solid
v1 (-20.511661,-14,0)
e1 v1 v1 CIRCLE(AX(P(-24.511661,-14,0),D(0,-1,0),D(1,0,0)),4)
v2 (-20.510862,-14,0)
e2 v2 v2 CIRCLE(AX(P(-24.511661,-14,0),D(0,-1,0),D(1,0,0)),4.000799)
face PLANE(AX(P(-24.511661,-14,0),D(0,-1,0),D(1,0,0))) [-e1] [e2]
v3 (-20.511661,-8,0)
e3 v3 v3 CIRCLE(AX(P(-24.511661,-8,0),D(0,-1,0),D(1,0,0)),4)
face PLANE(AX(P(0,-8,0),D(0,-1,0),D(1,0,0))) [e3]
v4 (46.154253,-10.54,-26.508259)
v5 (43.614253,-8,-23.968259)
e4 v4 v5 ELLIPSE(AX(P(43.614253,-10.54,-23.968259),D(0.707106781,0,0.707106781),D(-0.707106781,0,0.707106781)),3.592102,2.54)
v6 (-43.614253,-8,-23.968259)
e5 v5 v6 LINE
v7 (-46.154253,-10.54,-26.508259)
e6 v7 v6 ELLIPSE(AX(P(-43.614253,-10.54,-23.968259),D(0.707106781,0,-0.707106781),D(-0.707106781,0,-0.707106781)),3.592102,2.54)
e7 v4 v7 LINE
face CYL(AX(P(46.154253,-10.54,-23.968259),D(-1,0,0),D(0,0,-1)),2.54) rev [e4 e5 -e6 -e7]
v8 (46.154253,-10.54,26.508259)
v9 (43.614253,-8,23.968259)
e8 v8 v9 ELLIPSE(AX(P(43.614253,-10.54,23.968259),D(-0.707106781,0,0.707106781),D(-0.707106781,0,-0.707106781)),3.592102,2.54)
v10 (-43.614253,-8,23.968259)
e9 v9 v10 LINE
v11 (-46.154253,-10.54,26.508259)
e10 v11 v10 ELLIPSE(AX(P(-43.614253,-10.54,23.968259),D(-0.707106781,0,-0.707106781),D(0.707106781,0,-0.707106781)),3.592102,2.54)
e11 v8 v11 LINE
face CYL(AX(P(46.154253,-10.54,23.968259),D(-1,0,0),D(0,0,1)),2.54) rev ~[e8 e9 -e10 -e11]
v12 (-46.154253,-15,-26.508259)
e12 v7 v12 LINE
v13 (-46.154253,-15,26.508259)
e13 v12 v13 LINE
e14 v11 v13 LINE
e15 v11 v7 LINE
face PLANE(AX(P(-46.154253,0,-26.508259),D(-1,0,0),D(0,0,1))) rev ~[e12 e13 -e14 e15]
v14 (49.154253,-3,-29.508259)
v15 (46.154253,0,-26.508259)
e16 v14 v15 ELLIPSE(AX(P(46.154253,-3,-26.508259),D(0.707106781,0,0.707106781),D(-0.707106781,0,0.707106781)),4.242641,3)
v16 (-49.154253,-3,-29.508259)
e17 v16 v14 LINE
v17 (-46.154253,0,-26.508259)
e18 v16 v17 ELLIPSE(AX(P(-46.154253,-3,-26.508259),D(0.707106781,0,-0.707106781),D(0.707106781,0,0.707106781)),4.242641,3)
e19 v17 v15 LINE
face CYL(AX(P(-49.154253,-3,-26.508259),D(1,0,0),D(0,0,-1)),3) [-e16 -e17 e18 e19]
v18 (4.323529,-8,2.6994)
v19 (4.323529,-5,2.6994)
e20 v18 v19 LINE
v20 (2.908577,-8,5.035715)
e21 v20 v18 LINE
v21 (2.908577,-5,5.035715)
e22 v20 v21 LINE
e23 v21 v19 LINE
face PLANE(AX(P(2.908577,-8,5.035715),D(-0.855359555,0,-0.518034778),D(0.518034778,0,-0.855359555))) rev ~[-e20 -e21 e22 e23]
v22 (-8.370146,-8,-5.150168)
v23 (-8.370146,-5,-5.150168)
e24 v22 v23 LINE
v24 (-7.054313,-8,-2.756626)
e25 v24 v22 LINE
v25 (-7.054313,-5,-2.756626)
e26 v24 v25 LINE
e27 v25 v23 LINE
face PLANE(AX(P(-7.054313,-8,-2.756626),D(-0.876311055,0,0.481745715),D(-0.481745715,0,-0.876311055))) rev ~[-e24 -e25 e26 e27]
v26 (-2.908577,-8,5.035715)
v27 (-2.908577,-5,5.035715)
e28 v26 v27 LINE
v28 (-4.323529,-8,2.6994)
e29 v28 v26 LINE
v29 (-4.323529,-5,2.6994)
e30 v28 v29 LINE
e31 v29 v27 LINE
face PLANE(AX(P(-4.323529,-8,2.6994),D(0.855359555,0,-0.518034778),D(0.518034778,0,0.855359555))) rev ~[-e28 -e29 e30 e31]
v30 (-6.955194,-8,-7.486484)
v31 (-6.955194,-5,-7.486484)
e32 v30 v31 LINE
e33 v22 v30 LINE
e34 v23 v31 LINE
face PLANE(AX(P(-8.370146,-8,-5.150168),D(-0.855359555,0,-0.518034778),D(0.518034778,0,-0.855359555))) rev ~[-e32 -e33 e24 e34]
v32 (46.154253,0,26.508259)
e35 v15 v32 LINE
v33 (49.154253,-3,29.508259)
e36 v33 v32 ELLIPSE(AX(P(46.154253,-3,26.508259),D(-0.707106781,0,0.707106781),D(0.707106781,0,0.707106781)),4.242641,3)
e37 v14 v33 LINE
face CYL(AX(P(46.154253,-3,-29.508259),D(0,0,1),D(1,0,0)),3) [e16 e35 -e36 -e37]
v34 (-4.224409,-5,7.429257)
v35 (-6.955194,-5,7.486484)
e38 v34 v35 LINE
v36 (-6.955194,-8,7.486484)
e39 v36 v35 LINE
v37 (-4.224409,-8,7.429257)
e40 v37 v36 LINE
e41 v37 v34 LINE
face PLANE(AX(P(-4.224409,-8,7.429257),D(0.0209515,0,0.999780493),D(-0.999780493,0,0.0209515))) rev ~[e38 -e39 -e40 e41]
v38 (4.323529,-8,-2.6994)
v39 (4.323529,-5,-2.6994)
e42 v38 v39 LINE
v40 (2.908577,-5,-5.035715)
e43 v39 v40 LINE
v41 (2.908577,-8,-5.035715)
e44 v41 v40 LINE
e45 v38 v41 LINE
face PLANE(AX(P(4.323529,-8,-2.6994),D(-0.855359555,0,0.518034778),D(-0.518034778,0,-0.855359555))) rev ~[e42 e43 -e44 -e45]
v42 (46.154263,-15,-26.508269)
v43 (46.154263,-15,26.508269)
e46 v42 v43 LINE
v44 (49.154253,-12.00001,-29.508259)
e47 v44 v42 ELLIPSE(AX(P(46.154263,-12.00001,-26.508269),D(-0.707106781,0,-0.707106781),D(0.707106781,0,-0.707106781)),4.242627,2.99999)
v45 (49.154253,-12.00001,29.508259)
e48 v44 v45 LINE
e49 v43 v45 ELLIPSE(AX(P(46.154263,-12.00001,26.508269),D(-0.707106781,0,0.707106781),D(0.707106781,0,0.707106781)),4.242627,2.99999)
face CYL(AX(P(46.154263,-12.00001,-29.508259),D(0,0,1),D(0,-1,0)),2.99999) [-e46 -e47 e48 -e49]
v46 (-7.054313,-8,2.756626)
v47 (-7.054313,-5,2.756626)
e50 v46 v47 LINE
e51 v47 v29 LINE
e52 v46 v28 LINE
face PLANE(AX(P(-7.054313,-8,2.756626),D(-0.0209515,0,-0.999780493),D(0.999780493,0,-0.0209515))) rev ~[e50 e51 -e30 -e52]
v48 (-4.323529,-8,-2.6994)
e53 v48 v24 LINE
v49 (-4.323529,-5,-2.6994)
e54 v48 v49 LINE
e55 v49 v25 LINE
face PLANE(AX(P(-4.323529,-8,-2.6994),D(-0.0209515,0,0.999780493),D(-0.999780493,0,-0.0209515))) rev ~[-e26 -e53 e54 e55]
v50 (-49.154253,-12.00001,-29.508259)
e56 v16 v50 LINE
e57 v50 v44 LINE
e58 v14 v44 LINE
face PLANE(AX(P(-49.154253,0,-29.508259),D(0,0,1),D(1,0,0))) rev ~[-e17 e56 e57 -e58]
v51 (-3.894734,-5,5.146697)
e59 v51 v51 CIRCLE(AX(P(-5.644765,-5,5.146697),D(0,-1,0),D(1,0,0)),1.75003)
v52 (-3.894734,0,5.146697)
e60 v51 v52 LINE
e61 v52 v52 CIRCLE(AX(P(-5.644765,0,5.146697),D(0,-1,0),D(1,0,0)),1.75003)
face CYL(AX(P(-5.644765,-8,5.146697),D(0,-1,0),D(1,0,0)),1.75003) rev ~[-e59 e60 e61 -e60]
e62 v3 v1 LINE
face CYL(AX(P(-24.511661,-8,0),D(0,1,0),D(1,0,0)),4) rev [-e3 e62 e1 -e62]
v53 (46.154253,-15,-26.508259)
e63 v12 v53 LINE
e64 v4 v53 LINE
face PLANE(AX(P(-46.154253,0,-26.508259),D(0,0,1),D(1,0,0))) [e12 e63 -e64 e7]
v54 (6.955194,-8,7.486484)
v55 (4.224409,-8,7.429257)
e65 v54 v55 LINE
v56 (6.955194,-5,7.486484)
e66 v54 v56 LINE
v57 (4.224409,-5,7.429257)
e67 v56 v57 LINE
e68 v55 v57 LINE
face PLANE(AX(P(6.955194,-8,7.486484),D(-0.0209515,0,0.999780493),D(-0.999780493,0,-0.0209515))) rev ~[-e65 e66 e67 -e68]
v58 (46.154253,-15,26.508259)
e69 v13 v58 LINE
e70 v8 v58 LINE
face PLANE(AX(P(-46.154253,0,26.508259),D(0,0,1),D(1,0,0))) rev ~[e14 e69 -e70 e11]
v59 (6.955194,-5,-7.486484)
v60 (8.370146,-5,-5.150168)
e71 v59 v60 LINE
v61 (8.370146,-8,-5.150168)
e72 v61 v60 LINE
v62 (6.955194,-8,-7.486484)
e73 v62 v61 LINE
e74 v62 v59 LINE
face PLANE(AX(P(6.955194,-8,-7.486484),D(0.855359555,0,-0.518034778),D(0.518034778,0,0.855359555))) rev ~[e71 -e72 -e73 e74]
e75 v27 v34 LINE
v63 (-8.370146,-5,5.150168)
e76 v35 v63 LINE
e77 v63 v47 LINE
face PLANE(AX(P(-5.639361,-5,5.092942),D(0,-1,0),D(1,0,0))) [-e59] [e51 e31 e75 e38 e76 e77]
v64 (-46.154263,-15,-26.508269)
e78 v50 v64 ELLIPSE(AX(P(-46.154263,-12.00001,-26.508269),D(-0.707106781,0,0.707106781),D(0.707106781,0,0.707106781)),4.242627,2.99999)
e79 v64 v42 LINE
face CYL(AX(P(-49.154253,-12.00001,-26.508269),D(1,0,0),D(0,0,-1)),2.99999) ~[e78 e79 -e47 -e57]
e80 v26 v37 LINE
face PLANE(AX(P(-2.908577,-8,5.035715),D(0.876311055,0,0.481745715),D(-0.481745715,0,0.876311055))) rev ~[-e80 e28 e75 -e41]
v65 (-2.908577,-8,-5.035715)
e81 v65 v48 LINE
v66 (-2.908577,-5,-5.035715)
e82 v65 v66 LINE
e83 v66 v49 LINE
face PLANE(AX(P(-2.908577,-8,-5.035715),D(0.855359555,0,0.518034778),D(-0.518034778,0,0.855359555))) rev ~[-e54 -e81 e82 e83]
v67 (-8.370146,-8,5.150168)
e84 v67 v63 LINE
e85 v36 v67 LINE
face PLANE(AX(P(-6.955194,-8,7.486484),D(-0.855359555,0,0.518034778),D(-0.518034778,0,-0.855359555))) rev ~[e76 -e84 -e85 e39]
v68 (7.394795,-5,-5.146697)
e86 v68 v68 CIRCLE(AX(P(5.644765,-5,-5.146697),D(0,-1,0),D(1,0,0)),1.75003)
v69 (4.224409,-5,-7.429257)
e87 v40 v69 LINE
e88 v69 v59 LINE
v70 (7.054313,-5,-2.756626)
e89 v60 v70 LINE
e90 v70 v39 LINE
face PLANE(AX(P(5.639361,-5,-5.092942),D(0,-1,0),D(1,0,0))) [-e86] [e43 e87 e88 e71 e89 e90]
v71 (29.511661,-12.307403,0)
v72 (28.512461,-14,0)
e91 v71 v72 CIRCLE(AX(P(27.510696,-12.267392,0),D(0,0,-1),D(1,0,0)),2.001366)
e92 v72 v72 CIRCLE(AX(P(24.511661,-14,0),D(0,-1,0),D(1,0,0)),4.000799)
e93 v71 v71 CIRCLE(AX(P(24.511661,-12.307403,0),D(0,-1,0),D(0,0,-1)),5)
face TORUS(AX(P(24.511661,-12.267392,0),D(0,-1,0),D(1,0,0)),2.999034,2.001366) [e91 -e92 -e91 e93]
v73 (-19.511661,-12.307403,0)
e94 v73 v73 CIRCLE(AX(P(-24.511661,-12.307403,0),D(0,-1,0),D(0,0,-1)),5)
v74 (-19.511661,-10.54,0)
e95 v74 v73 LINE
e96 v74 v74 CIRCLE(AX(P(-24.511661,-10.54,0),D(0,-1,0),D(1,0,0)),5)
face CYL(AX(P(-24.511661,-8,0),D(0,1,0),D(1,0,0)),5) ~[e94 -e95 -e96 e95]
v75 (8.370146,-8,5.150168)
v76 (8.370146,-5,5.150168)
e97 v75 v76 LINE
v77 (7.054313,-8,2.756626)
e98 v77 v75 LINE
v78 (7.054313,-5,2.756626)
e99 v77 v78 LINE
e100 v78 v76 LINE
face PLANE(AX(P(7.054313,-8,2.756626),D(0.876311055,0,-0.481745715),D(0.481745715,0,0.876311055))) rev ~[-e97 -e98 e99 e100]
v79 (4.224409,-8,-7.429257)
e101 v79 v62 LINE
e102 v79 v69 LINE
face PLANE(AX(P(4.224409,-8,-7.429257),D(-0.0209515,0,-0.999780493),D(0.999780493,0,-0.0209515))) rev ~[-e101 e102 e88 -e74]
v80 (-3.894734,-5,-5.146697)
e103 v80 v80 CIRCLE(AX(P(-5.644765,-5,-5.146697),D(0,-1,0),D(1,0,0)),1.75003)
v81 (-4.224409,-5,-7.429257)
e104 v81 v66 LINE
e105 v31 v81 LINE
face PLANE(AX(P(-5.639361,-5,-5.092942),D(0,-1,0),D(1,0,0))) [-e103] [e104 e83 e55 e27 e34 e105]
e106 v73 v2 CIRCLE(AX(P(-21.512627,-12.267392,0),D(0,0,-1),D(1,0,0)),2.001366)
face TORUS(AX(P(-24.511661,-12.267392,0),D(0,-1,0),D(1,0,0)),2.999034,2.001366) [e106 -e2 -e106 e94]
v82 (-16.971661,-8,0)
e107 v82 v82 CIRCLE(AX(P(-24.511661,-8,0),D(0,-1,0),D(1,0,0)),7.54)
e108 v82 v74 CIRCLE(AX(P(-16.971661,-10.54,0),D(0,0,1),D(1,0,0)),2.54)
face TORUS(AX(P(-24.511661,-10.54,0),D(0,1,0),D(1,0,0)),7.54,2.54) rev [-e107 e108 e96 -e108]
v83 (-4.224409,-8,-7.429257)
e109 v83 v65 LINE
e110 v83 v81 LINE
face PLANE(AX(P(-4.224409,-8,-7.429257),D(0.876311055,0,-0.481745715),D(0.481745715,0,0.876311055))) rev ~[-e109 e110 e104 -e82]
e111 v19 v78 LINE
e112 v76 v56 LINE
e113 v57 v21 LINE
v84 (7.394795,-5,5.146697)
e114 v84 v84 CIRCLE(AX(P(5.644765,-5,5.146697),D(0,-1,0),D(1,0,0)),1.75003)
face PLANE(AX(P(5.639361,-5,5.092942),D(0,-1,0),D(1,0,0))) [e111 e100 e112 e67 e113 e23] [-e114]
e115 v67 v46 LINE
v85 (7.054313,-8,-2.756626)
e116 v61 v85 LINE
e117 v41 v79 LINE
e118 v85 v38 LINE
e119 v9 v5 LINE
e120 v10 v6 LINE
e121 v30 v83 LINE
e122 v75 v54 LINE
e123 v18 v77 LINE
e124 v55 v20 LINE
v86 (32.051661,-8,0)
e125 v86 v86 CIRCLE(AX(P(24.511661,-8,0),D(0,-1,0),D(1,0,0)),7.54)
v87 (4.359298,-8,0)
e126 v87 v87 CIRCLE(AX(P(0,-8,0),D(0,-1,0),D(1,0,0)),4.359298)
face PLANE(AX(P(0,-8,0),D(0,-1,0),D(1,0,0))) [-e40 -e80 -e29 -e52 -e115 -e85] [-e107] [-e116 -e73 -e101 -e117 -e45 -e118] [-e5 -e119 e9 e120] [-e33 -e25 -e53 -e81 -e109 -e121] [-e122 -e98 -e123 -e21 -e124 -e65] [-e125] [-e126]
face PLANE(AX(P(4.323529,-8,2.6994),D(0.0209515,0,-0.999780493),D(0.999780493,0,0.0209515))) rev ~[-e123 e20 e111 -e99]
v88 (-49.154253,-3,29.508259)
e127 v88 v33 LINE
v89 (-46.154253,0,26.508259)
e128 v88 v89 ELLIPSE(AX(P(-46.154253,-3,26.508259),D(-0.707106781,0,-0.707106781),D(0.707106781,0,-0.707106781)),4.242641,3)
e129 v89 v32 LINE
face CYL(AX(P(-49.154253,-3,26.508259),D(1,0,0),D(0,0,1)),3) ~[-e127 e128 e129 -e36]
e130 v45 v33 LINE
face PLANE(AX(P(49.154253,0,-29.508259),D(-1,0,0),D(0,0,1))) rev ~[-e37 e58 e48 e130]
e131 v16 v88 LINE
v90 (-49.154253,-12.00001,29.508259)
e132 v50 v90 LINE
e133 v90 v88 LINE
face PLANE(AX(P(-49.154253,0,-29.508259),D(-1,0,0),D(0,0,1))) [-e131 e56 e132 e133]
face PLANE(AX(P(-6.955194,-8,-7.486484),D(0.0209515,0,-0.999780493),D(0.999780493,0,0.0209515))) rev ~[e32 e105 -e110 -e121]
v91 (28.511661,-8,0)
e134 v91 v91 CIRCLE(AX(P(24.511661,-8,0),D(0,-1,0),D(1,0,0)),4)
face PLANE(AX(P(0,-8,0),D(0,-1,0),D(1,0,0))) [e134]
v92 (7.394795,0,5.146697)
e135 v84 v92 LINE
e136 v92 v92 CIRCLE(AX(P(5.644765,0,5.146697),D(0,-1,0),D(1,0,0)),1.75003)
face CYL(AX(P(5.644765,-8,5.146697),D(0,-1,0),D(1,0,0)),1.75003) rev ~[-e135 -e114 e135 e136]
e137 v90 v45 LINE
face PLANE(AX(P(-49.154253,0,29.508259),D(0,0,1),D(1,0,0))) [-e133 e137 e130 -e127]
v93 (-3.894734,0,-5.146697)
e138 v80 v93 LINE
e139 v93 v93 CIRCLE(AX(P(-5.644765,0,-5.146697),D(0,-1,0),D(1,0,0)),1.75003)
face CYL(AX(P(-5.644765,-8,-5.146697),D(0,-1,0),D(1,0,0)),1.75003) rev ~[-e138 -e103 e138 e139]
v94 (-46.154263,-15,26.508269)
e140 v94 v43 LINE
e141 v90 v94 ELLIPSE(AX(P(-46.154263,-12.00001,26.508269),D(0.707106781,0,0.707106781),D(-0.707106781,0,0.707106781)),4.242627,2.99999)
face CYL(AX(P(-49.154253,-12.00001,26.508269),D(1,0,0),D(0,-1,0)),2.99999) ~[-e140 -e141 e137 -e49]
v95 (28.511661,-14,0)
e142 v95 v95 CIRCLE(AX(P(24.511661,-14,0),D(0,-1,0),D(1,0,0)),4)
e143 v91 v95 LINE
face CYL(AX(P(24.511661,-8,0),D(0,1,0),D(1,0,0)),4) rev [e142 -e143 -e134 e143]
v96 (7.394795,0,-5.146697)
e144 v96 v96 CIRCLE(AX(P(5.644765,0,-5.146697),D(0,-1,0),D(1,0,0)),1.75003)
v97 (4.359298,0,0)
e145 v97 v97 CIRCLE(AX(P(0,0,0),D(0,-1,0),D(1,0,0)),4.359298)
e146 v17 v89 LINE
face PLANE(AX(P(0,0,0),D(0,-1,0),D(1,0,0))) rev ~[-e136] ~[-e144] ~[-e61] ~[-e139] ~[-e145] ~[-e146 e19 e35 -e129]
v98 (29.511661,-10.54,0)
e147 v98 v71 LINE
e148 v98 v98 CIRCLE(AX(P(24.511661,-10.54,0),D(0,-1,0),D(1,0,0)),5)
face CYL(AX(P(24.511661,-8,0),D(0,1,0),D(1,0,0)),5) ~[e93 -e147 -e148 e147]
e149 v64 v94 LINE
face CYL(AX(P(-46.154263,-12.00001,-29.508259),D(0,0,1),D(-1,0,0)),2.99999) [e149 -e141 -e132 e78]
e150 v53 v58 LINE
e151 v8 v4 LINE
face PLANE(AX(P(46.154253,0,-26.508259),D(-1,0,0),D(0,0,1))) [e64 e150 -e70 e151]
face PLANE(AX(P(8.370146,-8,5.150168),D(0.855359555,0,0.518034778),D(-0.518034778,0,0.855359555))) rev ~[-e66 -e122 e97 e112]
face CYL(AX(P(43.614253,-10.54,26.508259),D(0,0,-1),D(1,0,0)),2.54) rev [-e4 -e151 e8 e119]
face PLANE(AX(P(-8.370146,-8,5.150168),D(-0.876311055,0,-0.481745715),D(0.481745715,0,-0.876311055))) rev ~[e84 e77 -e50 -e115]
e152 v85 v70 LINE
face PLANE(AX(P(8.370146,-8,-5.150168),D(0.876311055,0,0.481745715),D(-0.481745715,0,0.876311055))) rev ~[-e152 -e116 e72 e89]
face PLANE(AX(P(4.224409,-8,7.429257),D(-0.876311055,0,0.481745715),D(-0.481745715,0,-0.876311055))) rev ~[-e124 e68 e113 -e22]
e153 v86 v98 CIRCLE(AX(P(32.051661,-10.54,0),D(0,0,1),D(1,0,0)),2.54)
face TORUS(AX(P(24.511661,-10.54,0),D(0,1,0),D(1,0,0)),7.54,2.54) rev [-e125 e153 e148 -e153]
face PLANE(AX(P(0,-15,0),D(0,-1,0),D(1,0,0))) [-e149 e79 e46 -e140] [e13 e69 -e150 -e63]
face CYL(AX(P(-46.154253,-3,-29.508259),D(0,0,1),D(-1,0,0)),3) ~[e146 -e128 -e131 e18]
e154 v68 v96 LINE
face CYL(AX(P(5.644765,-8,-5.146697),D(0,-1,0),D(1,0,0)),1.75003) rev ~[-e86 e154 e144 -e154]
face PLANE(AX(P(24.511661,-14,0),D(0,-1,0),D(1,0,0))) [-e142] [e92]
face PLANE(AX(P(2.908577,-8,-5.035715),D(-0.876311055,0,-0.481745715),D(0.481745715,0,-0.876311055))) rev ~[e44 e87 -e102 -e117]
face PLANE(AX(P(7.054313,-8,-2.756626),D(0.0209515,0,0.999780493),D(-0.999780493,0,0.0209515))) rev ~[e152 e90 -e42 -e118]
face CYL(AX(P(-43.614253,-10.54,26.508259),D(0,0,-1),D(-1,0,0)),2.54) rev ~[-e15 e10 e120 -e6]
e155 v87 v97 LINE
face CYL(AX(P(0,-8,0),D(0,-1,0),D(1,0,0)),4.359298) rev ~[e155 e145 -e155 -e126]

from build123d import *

# Parameters (mm, degrees)
F0_W     = 98.3085063696
F0_H     = 59.0165173113
F0_W_2   = 92.3085063696
F0_H_2   = 53.0165173113
F1_DEPTH = 8
F2_DEPTH = 15
F3_R     = 4.3592981544
F3_R_2   = 1.7500302992
F4_DEPTH = 8.001
F3_R_3   = 5
F3_R_4   = 4
F5_DEPTH = 6
F6_R     = 2.54
F7_R     = 1.7500302992
F8_DEPTH = 3
F9_R     = 3
F10_R    = 2.99999


# Not quite as in the source:
# - a fillet or chamfer that OpenCascade refuses, or shapes differently, is made with other operations: its cross-section is extruded or revolved along the edge and cut away or added
# - a fillet or chamfer is up to 0.001 mm smaller than in the source, because OpenCascade refuses the exact size


with BuildPart() as f1:
    # F0 (on Front) → F1 (new body)
    with BuildSketch(Plane.XZ):
        Rectangle(F0_W, F0_H)
        Rectangle(F0_W_2, F0_H_2, mode=Mode.SUBTRACT)
        Rectangle(F0_W_2, F0_H_2)
    extrude(amount=F1_DEPTH)

    # F0 (on Front) → F2 (join)
    with BuildSketch(Plane.XZ):
        Rectangle(F0_W, F0_H)
        Rectangle(F0_W_2, F0_H_2, mode=Mode.SUBTRACT)
    extrude(amount=F2_DEPTH)

    # F3 (on face) → F4 (cut, through all)
    with BuildSketch(Plane.XZ.offset(8)):
        Circle(F3_R)
        with Locations((5.6447647512, 5.1466971636)):
            Circle(F3_R_2)
        with Locations((-5.6447647512, 5.1466971636)):
            Circle(F3_R_2)
        with Locations((-5.6447647512, -5.1466971636)):
            Circle(F3_R_2)
        with Locations((5.6447647512, -5.1466971636)):
            Circle(F3_R_2)
    extrude(amount=-F4_DEPTH, mode=Mode.SUBTRACT)

    # F3 (on face) → F5 (join)
    with BuildSketch(Plane.XZ.offset(8)):
        with Locations((-24.5116613805, 0)):
            Circle(F3_R_3)
        with Locations((-24.5116613805, 0)):
            Circle(F3_R_4, mode=Mode.SUBTRACT)
        with Locations((24.5116613805, 0)):
            Circle(F3_R_3)
        with Locations((24.5116613805, 0)):
            Circle(F3_R_4, mode=Mode.SUBTRACT)
    extrude(amount=F5_DEPTH)

    # F6
    f6_edges = [f1.edges().sort_by_distance(p)[0] for p in [
        (-29.511661, -8, 0),
        (19.511661, -8, 0),
        (0, -8, -26.508259),
        (46.154253, -8, 0),
        (-46.154253, -8, 0),
        (0, -8, 26.508259),
    ]]
    fillet(f6_edges, radius=F6_R)

    # F7 (on face) → F8 (cut)
    with BuildSketch(Plane.XZ.offset(8)):
        Polygon((-2.9085768434, 5.0357150996), (-4.2244093493, 7.4292570353), (-6.9551937235, 7.4864836259), (-8.3701455918, 5.1501682809), (-7.054313086, 2.7566263452), (-4.3235287118, 2.6993997546), align=None)
        with Locations((-5.6447647512, 5.1466971636)):
            Circle(F7_R, mode=Mode.SUBTRACT)
        Polygon((8.3701455918, 5.1501682809), (6.9551937235, 7.4864836259), (4.2244093493, 7.4292570353), (2.9085768434, 5.0357150996), (4.3235287118, 2.6993997546), (7.054313086, 2.7566263452), align=None)
        with Locations((5.6447647512, 5.1466971636)):
            Circle(F7_R, mode=Mode.SUBTRACT)
        Polygon((4.3235287118, -2.6993997546), (2.9085768434, -5.0357150996), (4.2244093493, -7.4292570353), (6.9551937235, -7.4864836259), (8.3701455918, -5.1501682809), (7.054313086, -2.7566263452), align=None)
        with Locations((5.6447647512, -5.1466971636)):
            Circle(F7_R, mode=Mode.SUBTRACT)
        Polygon((-2.9085768434, -5.0357150996), (-4.3235287118, -2.6993997546), (-7.054313086, -2.7566263452), (-8.3701455918, -5.1501682809), (-6.9551937235, -7.4864836259), (-4.2244093493, -7.4292570353), align=None)
        with Locations((-5.6447647512, -5.1466971636)):
            Circle(F7_R, mode=Mode.SUBTRACT)
    extrude(amount=-F8_DEPTH, mode=Mode.SUBTRACT)

    # F9
    f9_edges = [f1.edges().sort_by_distance(p)[0] for p in [
        (0, 0, 29.508259),
        (49.154253, 0, 0),
        (0, 0, -29.508259),
        (-49.154253, 0, 0),
    ]]
    fillet(f9_edges, radius=F9_R)

    # F10 (radius 3 in the source; OpenCascade refuses exactly that, so slightly less here)
    f10_edges = [f1.edges().sort_by_distance(p)[0] for p in [
        (0, -15, -29.508259),
        (49.154253, -15, 0),
        (-49.154253, -15, 0),
        (0, -15, 29.508259),
    ]]
    fillet(f10_edges, radius=F10_R)

    # F11: fillet of radius 2 on 2 edges, made by hand

    # F11_s1 → F11_t2 (revolve, cut)
    with BuildSketch(Plane.XY):
        with BuildLine():
            ThreePointArc((29.5120613805, -12.2673917434), (29.2440686279, -13.2678330874), (28.5118614771, -14.0003463544))
            Line((28.5118614771, -14.0003463544), (28.6119780552, -14.1736418155))
            ThreePointArc((28.6119780552, -14.1736418155), (29.0117614288, -14.2001365685), (29.5116613805, -14.2001365685))
            Line((29.5116613805, -14.2001365685), (29.7117979491, -14))
            ThreePointArc((29.7117979491, -14), (29.7117979491, -13.1336958717), (29.7121979491, -12.2673917434))
            Line((29.7121979491, -12.2673917434), (29.5120613805, -12.2673917434))
        make_face()
    revolve(axis=Axis((24.5116613805, -14, 0), (0, -1, 0)), mode=Mode.SUBTRACT)

    # F11_s3 → F11_t4 (revolve, cut)
    with BuildSketch(Plane.XY):
        with BuildLine():
            ThreePointArc((-19.5112613805, -12.2673917434), (-19.7792541332, -13.2678330874), (-20.511461284, -14.0003463544))
            Line((-20.511461284, -14.0003463544), (-20.4113447058, -14.1736418155))
            ThreePointArc((-20.4113447058, -14.1736418155), (-20.0115613323, -14.2001365685), (-19.5116613805, -14.2001365685))
            Line((-19.5116613805, -14.2001365685), (-19.311524812, -14))
            ThreePointArc((-19.311524812, -14), (-19.311524812, -13.1336958717), (-19.311124812, -12.2673917434))
            Line((-19.311124812, -12.2673917434), (-19.5112613805, -12.2673917434))
        make_face()
    revolve(axis=Axis((-24.5116613805, -14, 0), (0, -1, 0)), mode=Mode.SUBTRACT)


solid = f1.part
